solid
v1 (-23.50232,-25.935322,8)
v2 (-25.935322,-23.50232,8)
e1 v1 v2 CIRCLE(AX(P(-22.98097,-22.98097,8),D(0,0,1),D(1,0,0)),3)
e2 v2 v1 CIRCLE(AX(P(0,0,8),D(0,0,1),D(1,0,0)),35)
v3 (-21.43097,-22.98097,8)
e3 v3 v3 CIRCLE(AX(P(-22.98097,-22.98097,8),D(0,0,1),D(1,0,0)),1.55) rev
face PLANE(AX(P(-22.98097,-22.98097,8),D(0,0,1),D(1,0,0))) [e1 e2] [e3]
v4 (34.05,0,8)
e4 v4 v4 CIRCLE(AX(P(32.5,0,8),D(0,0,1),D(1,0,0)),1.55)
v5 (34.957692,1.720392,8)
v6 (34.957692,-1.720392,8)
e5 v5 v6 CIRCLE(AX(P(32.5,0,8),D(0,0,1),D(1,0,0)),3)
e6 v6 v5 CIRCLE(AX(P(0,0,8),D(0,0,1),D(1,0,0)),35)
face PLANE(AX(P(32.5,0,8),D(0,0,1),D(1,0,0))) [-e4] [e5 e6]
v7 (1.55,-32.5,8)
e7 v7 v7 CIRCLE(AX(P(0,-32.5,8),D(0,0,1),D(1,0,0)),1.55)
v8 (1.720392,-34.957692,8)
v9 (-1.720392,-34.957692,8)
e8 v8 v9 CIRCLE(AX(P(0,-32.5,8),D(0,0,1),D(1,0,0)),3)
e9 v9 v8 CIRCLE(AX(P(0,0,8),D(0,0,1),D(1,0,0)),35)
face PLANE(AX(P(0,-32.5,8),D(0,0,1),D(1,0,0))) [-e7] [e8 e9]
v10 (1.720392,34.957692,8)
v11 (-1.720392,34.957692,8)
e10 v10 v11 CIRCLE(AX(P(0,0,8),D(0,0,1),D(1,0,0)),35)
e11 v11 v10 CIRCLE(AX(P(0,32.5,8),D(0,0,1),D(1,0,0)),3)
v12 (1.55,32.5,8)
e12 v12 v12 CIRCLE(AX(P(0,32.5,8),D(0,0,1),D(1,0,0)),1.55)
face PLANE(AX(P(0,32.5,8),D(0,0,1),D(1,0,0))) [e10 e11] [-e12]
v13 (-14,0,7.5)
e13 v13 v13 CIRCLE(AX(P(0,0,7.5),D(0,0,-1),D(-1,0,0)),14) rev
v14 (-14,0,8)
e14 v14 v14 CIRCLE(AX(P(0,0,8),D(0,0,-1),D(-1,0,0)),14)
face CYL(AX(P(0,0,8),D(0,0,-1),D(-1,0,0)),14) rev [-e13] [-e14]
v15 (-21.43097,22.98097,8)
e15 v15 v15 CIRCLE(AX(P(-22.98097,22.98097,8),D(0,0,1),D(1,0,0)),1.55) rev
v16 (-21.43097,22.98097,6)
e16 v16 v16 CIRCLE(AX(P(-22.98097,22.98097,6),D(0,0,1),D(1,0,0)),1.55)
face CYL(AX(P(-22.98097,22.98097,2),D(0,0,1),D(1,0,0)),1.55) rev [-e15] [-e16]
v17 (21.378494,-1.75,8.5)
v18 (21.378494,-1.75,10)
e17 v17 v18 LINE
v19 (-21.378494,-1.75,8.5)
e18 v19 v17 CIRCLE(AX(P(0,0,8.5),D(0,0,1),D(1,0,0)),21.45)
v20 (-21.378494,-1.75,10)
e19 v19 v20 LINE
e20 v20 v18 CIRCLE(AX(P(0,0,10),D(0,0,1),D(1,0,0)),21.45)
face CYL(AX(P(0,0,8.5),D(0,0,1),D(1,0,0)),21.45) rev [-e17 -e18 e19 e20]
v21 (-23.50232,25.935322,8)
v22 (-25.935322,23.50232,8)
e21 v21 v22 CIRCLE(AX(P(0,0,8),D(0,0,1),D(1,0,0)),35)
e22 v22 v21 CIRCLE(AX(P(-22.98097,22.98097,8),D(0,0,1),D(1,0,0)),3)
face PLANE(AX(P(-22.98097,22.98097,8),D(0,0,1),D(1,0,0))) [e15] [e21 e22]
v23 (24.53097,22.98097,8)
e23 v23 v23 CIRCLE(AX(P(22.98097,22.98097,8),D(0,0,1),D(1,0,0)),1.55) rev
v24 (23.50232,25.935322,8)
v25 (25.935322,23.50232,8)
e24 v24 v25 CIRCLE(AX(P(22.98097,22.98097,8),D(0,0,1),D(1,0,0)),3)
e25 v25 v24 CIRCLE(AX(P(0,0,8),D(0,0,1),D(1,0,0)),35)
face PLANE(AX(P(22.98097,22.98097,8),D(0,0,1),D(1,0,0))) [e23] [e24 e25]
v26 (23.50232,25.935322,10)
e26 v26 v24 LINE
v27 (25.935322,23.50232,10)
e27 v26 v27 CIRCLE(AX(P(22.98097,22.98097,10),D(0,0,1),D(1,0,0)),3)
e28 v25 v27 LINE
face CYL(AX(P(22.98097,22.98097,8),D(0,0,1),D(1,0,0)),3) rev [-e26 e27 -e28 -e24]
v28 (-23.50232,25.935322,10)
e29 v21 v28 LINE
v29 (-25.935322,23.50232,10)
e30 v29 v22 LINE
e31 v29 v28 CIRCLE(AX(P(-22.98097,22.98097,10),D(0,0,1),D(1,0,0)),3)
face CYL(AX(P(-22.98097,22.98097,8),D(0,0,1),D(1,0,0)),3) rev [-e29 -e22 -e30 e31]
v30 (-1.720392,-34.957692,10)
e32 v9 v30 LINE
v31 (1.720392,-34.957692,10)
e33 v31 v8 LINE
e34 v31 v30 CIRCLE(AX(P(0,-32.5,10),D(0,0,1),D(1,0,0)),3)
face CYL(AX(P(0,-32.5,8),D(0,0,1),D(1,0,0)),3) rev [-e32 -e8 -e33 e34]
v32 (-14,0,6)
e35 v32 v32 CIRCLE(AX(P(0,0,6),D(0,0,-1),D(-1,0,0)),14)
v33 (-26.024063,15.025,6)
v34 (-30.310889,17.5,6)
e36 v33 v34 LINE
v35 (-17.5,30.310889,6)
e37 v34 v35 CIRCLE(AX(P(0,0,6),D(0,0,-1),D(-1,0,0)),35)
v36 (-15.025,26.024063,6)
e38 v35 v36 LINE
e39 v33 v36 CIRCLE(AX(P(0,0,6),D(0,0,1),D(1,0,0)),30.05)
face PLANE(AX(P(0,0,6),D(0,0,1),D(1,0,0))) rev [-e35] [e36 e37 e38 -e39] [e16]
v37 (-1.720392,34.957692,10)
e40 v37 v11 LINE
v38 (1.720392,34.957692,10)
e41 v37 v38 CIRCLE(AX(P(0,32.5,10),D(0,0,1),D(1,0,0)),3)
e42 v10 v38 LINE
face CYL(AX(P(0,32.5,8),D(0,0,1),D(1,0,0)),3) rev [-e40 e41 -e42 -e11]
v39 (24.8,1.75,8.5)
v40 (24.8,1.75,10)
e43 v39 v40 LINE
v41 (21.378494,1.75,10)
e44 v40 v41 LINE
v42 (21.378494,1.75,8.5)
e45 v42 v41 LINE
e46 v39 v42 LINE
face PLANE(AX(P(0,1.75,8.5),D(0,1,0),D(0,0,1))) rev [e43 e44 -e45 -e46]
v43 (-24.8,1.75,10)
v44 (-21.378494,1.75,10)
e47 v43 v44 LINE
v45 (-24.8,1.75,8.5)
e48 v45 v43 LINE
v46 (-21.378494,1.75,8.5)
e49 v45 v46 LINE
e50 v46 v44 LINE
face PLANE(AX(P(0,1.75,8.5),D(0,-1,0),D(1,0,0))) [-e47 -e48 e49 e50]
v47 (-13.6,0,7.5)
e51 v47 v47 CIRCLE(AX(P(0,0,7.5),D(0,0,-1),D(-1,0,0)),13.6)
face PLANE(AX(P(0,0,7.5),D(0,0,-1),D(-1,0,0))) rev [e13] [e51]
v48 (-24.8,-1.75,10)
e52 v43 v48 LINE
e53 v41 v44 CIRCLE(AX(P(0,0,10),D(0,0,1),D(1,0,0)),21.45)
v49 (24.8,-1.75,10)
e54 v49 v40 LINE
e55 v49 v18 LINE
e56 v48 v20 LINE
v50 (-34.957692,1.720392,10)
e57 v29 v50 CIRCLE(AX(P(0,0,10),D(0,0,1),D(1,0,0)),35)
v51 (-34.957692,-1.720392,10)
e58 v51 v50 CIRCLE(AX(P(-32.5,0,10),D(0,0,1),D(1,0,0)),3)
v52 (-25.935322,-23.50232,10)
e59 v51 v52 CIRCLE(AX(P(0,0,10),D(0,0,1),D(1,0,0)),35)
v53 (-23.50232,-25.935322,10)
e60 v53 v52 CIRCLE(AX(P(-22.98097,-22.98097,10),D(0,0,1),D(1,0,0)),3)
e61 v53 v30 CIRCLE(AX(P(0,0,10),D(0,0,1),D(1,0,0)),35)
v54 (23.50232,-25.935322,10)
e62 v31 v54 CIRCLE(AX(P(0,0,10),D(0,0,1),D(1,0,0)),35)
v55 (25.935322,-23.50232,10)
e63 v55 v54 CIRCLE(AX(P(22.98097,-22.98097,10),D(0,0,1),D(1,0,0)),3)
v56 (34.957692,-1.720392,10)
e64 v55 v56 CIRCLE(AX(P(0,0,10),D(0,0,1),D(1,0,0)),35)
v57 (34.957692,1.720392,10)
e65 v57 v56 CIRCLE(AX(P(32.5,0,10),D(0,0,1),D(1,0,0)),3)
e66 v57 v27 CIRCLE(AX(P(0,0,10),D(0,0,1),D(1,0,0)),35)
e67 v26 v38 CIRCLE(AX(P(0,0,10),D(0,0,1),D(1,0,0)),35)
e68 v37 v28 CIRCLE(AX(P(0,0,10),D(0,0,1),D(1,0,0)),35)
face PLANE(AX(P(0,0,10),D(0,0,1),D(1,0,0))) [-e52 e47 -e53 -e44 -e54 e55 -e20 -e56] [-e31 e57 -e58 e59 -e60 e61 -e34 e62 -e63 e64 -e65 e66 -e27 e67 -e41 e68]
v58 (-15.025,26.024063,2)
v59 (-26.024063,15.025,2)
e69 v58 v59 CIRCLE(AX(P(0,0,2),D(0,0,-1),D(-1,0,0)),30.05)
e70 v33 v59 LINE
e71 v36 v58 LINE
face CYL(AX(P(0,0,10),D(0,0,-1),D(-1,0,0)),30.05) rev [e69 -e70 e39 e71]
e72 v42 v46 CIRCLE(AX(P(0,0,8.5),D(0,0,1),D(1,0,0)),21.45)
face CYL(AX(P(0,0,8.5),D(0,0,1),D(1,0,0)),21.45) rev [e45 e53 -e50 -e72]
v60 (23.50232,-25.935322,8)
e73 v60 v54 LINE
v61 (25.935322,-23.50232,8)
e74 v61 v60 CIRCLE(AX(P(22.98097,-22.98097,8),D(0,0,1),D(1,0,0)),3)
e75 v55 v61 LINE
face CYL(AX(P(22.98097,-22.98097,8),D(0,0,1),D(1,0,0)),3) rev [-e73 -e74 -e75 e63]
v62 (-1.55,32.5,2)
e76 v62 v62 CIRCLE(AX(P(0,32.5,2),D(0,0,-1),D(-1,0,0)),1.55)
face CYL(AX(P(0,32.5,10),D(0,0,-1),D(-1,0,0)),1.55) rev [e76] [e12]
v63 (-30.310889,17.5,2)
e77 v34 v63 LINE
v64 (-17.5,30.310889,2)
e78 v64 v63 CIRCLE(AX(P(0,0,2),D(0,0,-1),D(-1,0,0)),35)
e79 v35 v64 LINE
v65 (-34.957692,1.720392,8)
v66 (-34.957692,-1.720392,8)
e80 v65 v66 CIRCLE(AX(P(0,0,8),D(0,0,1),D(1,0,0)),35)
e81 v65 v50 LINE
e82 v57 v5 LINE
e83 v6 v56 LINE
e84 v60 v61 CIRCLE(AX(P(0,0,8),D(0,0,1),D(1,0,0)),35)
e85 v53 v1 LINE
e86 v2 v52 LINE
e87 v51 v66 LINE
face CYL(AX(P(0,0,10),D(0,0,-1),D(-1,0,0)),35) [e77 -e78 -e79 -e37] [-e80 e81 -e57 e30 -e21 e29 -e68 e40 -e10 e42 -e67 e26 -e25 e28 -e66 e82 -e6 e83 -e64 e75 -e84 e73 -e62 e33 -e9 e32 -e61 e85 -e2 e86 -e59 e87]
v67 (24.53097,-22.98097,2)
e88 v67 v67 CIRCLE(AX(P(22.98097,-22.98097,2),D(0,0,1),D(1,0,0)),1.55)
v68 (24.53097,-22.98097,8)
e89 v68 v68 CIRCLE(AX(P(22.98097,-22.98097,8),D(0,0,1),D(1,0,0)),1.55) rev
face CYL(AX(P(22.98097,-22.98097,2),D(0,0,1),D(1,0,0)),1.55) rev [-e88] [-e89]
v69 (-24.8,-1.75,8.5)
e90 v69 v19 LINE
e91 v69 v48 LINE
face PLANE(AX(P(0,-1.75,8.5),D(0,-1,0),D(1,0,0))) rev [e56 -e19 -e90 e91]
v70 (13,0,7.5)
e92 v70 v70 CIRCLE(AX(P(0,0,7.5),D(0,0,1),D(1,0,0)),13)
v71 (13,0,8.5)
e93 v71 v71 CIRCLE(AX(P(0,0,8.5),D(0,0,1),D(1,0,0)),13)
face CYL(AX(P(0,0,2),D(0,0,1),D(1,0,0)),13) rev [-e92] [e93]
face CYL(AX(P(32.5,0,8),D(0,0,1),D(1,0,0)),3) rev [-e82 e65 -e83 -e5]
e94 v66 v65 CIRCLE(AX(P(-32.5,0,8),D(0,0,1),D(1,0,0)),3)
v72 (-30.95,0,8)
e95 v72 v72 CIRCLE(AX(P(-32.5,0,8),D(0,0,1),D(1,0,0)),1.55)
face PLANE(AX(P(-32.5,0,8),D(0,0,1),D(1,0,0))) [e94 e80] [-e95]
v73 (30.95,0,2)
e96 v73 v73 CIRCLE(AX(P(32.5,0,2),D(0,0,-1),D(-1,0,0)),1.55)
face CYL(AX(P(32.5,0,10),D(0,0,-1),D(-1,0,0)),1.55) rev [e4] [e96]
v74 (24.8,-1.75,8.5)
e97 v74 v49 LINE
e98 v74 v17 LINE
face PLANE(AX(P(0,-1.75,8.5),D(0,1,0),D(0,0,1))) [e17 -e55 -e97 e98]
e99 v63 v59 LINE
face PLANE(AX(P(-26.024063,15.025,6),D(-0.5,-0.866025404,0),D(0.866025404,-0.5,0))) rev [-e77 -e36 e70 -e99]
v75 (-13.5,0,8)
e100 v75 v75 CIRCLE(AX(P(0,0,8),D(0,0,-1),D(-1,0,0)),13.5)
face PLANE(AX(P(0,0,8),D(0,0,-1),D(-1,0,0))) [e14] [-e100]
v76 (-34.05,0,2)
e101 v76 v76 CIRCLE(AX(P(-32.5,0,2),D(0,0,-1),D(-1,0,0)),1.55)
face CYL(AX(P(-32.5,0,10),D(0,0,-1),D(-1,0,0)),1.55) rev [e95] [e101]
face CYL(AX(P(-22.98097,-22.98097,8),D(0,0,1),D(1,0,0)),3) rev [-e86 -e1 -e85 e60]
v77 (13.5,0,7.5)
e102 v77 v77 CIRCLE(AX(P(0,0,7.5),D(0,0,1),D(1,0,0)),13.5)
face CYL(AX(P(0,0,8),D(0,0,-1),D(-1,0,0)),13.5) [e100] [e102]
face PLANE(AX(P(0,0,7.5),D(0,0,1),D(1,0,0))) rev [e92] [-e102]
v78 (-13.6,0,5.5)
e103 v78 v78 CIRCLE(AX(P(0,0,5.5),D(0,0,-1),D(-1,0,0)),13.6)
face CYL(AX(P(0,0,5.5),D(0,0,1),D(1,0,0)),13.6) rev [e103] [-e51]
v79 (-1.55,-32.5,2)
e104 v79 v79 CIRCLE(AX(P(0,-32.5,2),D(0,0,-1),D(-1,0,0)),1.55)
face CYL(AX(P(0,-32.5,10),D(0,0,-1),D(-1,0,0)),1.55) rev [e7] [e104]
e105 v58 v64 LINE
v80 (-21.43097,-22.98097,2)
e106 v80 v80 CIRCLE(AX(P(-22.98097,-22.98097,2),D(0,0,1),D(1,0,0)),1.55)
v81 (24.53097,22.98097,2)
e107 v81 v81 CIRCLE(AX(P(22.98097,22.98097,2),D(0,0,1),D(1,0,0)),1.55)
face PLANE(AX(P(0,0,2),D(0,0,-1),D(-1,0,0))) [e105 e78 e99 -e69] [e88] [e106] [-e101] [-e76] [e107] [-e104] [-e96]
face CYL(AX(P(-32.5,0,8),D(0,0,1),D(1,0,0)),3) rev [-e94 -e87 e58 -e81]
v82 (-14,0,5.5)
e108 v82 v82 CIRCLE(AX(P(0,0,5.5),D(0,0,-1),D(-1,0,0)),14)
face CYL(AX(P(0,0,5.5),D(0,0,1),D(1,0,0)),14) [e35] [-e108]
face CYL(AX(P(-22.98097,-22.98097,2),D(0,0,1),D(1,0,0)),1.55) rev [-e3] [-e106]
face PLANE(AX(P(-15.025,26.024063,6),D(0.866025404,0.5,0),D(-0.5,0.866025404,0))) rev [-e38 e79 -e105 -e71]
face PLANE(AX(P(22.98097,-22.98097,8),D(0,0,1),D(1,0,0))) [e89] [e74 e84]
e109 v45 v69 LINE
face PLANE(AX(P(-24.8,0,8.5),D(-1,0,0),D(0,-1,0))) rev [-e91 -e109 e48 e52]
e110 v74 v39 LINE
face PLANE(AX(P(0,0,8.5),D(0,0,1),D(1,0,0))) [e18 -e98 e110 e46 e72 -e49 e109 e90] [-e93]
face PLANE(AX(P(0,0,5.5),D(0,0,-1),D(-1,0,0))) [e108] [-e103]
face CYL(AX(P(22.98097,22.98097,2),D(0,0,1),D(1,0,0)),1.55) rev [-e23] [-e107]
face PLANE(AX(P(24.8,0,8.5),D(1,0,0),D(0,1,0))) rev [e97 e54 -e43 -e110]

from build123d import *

# Parameters (mm, degrees)
EXTRUDE_1_OUTLINE_R   = 35
EXTRUDE_1_OUTLINE_R_2 = 1.55
EXTRUDE_1_OUTLINE_R_3 = 30.05
EXTRUDE_1_DEPTH       = 10
SKETCH_2_R            = 33.525
SKETCH_2_R_2          = 18.525
EXTRUDE_1_2_DEPTH     = 4
SKETCH_3_R            = 1.55
CUT_EXTRUDE_1_DEPTH   = 51.497524692
CUT_EXTRUDE_2_DEPTH   = 6
SKETCH_8_R            = 35
SKETCH_8_R_2          = 30.05
CUT_EXTRUDE_3_DEPTH   = 2
SKETCH_9_R            = 3
CUT_EXTRUDE_4_DEPTH   = 2
SKETCH_10_R           = 1.55
CUT_EXTRUDE_5_DEPTH   = 51.139804547
SKETCH_11_R           = 3
CUT_EXTRUDE_6_DEPTH   = 2
SKETCH_14_R           = 18.525
SKETCH_14_R_2         = 13.5
EXTRUDE_2_DEPTH       = 4
SKETCH_15_R           = 17.5
CUT_EXTRUDE_8_DEPTH   = 1.5
SKETCH_17_R           = 17.5
SKETCH_17_R_2         = 12.5
CUT_EXTRUDE_9_DEPTH   = 1
SKETCH1_R             = 13.5
SKETCH1_R_2           = 12
BOSS_EXTRUDE1_DEPTH   = 1
CUT_EXTRUDE1_START    = -2
SKETCH2_R             = 14
SKETCH2_R_2           = 13.5
CUT_EXTRUDE1_DEPTH    = 2
SKETCH3_R             = 14
SKETCH3_R_2           = 13.6
BOSS_EXTRUDE2_DEPTH   = 2
SKETCH5_R             = 12.5
SKETCH5_R_2           = 12
CUT_EXTRUDE3_DEPTH    = 50.922439844
SKETCH6_R             = 13
SKETCH6_R_2           = 12.5
CUT_EXTRUDE4_DEPTH    = 50.922439844
SKETCH7_R             = 17.5
SKETCH7_R_2           = 13.5
CUT_EXTRUDE5_DEPTH    = 0.5


# Read off the part's stored shape, not the designer's step: 凸台-拉伸1
with BuildPart() as part:
    # Extrude 1 outline → Extrude 1 (new body)
    with BuildSketch(Plane.XY):
        Circle(EXTRUDE_1_OUTLINE_R)
        with Locations((0, -32.5)):
            Circle(EXTRUDE_1_OUTLINE_R_2, mode=Mode.SUBTRACT)
        with Locations((-32.5, 0)):
            Circle(EXTRUDE_1_OUTLINE_R_2, mode=Mode.SUBTRACT)
        Circle(EXTRUDE_1_OUTLINE_R_3, mode=Mode.SUBTRACT)
        with Locations((32.5, 0)):
            Circle(EXTRUDE_1_OUTLINE_R_2, mode=Mode.SUBTRACT)
        with Locations((0, 32.5)):
            Circle(EXTRUDE_1_OUTLINE_R_2, mode=Mode.SUBTRACT)
    extrude(amount=EXTRUDE_1_DEPTH)

    # 草图2 → Extrude 1 2 (add)
    with BuildSketch(Plane.XY.offset(10)):
        Circle(SKETCH_2_R)
        Circle(SKETCH_2_R_2, mode=Mode.SUBTRACT)
    extrude(amount=-EXTRUDE_1_2_DEPTH)

    # 草图3 → 切除-拉伸1 (cut, through all)
    with BuildSketch(Plane(origin=(0, 0, 0), x_dir=(-1, 0, 0), z_dir=(0, 0, -1))):
        with Locations(Location((32.5, 0, 0), (0, 0, 180))):
            Circle(SKETCH_3_R)
        with Locations(Location((0, -32.5, 0), (0, 0, 180))):
            Circle(SKETCH_3_R)
        with Locations(Location((-32.5, 0, 0), (0, 0, 180))):
            Circle(SKETCH_3_R)
        with Locations(Location((0, 32.5, 0), (0, 0, 180))):
            Circle(SKETCH_3_R)
    extrude(amount=-CUT_EXTRUDE_1_DEPTH, mode=Mode.SUBTRACT)

    # 草图7 → 切除-拉伸2 (cut)
    with BuildSketch(Plane(origin=(0, 0, 0), x_dir=(-1, 0, 0), z_dir=(0, 0, -1))):
        with BuildLine():
            Line((15.025, 26.024063384), (17.5, 30.310889132))
            ThreePointArc((17.5, 30.310889132), (24.748737342, 24.748737342), (30.310889132, 17.5))
            Line((30.310889132, 17.5), (26.024063384, 15.025))
            ThreePointArc((26.024063384, 15.025), (21.248558775, 21.248558775), (15.025, 26.024063384))
        make_face()
    extrude(amount=-CUT_EXTRUDE_2_DEPTH, mode=Mode.SUBTRACT)

    # 草图8 → 切除-拉伸3 (cut)
    with BuildSketch(Plane(origin=(0, 0, 0), x_dir=(-1, 0, 0), z_dir=(0, 0, -1))):
        with Locations(Location((0, 0, 0), (0, 0, 30))):
            Circle(SKETCH_8_R)
        Circle(SKETCH_8_R_2, mode=Mode.SUBTRACT)
    extrude(amount=-CUT_EXTRUDE_3_DEPTH, mode=Mode.SUBTRACT)

    # 草图9 → 切除-拉伸4 (cut)
    with BuildSketch(Plane.XY.offset(10)):
        with Locations((0, 32.5)):
            Circle(SKETCH_9_R)
        with Locations((32.5, 0)):
            Circle(SKETCH_9_R)
        with Locations((0, -32.5)):
            Circle(SKETCH_9_R)
        with Locations((-32.5, 0)):
            Circle(SKETCH_9_R)
    extrude(amount=-CUT_EXTRUDE_4_DEPTH, mode=Mode.SUBTRACT)

    # 草图10 → 切除-拉伸5 (cut, through all)
    with BuildSketch(Plane.XY.offset(10)):
        with Locations((22.980970389, 22.980970389)):
            Circle(SKETCH_10_R)
        with Locations((22.980970389, -22.980970389)):
            Circle(SKETCH_10_R)
        with Locations((-22.980970389, -22.980970389)):
            Circle(SKETCH_10_R)
        with Locations((-22.980970389, 22.980970389)):
            Circle(SKETCH_10_R)
    extrude(amount=-CUT_EXTRUDE_5_DEPTH, mode=Mode.SUBTRACT)

    # 草图11 → 切除-拉伸6 (cut)
    with BuildSketch(Plane.XY.offset(10)):
        with Locations((22.980970389, 22.980970389)):
            Circle(SKETCH_11_R)
        with Locations((22.980970389, -22.980970389)):
            Circle(SKETCH_11_R)
        with Locations((-22.980970389, -22.980970389)):
            Circle(SKETCH_11_R)
        with Locations((-22.980970389, 22.980970389)):
            Circle(SKETCH_11_R)
    extrude(amount=-CUT_EXTRUDE_6_DEPTH, mode=Mode.SUBTRACT)

    # 草图14 → 凸台-拉伸2 (add)
    with BuildSketch(Plane.XY.offset(10)):
        Circle(SKETCH_14_R)
        Circle(SKETCH_14_R_2, mode=Mode.SUBTRACT)
    extrude(amount=-EXTRUDE_2_DEPTH)

    # 草图15 → 切除-拉伸8 (cut)
    with BuildSketch(Plane.XY.offset(10)):
        with BuildLine():
            ThreePointArc((21.378493867, 1.75), (0, 21.45), (-21.378493867, 1.75))
            Line((-21.378493866, 1.75), (-24.8, 1.75))
            Line((-24.8, 1.75), (-24.8, -1.75))
            Line((-24.8, -1.75), (-21.378493867, -1.75))
            ThreePointArc((-21.378493867, -1.75), (0, -21.45), (21.378493867, -1.75))
            Line((21.378493867, -1.75), (24.8, -1.75))
            Line((24.8, -1.75), (24.8, 1.75))
            Line((24.8, 1.75), (21.378493867, 1.75))
        make_face()
        Circle(SKETCH_15_R, mode=Mode.SUBTRACT)
    extrude(amount=-CUT_EXTRUDE_8_DEPTH, mode=Mode.SUBTRACT)

    # 草图17 → 切除-拉伸9 (cut)
    with BuildSketch(Plane.XY.offset(10)):
        Circle(SKETCH_17_R)
        Circle(SKETCH_17_R_2, mode=Mode.SUBTRACT)
    extrude(amount=-CUT_EXTRUDE_9_DEPTH, mode=Mode.SUBTRACT)

    # Sketch1 → Boss-Extrude1 (add)
    with BuildSketch(Plane.XY.offset(8.5)):
        Circle(SKETCH1_R)
        Circle(SKETCH1_R_2, mode=Mode.SUBTRACT)
    extrude(amount=-BOSS_EXTRUDE1_DEPTH)

    # Sketch2 → Cut-Extrude1 (cut)
    with BuildSketch(Plane(origin=(0, 0, 6), x_dir=(-1, 0, 0), z_dir=(0, 0, -1)).offset(CUT_EXTRUDE1_START)):
        Circle(SKETCH2_R)
        with Locations(Location((0, 0, 0), (0, 0, 180))):
            Circle(SKETCH2_R_2, mode=Mode.SUBTRACT)
    extrude(amount=CUT_EXTRUDE1_DEPTH, mode=Mode.SUBTRACT)

    # Sketch3 → Boss-Extrude2 (add)
    with BuildSketch(Plane(origin=(0, 0, 7.5), x_dir=(-1, 0, 0), z_dir=(0, 0, -1))):
        Circle(SKETCH3_R)
        Circle(SKETCH3_R_2, mode=Mode.SUBTRACT)
    extrude(amount=BOSS_EXTRUDE2_DEPTH)

    # Sketch5 → Cut-Extrude3 (cut, through all)
    with BuildSketch(Plane.XY.offset(8.5)):
        Circle(SKETCH5_R)
        Circle(SKETCH5_R_2, mode=Mode.SUBTRACT)
    extrude(amount=-CUT_EXTRUDE3_DEPTH, mode=Mode.SUBTRACT)

    # Sketch6 → Cut-Extrude4 (cut, through all)
    with BuildSketch(Plane.XY.offset(8.5)):
        Circle(SKETCH6_R)
        Circle(SKETCH6_R_2, mode=Mode.SUBTRACT)
    extrude(amount=-CUT_EXTRUDE4_DEPTH, mode=Mode.SUBTRACT)

    # Sketch7 → Cut-Extrude5 (cut)
    with BuildSketch(Plane.XY.offset(9)):
        Circle(SKETCH7_R)
        with Locations(Location((0, 0, 0), (0, 0, 180))):
            Circle(SKETCH7_R_2, mode=Mode.SUBTRACT)
    extrude(amount=-CUT_EXTRUDE5_DEPTH, mode=Mode.SUBTRACT)


solid = part.part
